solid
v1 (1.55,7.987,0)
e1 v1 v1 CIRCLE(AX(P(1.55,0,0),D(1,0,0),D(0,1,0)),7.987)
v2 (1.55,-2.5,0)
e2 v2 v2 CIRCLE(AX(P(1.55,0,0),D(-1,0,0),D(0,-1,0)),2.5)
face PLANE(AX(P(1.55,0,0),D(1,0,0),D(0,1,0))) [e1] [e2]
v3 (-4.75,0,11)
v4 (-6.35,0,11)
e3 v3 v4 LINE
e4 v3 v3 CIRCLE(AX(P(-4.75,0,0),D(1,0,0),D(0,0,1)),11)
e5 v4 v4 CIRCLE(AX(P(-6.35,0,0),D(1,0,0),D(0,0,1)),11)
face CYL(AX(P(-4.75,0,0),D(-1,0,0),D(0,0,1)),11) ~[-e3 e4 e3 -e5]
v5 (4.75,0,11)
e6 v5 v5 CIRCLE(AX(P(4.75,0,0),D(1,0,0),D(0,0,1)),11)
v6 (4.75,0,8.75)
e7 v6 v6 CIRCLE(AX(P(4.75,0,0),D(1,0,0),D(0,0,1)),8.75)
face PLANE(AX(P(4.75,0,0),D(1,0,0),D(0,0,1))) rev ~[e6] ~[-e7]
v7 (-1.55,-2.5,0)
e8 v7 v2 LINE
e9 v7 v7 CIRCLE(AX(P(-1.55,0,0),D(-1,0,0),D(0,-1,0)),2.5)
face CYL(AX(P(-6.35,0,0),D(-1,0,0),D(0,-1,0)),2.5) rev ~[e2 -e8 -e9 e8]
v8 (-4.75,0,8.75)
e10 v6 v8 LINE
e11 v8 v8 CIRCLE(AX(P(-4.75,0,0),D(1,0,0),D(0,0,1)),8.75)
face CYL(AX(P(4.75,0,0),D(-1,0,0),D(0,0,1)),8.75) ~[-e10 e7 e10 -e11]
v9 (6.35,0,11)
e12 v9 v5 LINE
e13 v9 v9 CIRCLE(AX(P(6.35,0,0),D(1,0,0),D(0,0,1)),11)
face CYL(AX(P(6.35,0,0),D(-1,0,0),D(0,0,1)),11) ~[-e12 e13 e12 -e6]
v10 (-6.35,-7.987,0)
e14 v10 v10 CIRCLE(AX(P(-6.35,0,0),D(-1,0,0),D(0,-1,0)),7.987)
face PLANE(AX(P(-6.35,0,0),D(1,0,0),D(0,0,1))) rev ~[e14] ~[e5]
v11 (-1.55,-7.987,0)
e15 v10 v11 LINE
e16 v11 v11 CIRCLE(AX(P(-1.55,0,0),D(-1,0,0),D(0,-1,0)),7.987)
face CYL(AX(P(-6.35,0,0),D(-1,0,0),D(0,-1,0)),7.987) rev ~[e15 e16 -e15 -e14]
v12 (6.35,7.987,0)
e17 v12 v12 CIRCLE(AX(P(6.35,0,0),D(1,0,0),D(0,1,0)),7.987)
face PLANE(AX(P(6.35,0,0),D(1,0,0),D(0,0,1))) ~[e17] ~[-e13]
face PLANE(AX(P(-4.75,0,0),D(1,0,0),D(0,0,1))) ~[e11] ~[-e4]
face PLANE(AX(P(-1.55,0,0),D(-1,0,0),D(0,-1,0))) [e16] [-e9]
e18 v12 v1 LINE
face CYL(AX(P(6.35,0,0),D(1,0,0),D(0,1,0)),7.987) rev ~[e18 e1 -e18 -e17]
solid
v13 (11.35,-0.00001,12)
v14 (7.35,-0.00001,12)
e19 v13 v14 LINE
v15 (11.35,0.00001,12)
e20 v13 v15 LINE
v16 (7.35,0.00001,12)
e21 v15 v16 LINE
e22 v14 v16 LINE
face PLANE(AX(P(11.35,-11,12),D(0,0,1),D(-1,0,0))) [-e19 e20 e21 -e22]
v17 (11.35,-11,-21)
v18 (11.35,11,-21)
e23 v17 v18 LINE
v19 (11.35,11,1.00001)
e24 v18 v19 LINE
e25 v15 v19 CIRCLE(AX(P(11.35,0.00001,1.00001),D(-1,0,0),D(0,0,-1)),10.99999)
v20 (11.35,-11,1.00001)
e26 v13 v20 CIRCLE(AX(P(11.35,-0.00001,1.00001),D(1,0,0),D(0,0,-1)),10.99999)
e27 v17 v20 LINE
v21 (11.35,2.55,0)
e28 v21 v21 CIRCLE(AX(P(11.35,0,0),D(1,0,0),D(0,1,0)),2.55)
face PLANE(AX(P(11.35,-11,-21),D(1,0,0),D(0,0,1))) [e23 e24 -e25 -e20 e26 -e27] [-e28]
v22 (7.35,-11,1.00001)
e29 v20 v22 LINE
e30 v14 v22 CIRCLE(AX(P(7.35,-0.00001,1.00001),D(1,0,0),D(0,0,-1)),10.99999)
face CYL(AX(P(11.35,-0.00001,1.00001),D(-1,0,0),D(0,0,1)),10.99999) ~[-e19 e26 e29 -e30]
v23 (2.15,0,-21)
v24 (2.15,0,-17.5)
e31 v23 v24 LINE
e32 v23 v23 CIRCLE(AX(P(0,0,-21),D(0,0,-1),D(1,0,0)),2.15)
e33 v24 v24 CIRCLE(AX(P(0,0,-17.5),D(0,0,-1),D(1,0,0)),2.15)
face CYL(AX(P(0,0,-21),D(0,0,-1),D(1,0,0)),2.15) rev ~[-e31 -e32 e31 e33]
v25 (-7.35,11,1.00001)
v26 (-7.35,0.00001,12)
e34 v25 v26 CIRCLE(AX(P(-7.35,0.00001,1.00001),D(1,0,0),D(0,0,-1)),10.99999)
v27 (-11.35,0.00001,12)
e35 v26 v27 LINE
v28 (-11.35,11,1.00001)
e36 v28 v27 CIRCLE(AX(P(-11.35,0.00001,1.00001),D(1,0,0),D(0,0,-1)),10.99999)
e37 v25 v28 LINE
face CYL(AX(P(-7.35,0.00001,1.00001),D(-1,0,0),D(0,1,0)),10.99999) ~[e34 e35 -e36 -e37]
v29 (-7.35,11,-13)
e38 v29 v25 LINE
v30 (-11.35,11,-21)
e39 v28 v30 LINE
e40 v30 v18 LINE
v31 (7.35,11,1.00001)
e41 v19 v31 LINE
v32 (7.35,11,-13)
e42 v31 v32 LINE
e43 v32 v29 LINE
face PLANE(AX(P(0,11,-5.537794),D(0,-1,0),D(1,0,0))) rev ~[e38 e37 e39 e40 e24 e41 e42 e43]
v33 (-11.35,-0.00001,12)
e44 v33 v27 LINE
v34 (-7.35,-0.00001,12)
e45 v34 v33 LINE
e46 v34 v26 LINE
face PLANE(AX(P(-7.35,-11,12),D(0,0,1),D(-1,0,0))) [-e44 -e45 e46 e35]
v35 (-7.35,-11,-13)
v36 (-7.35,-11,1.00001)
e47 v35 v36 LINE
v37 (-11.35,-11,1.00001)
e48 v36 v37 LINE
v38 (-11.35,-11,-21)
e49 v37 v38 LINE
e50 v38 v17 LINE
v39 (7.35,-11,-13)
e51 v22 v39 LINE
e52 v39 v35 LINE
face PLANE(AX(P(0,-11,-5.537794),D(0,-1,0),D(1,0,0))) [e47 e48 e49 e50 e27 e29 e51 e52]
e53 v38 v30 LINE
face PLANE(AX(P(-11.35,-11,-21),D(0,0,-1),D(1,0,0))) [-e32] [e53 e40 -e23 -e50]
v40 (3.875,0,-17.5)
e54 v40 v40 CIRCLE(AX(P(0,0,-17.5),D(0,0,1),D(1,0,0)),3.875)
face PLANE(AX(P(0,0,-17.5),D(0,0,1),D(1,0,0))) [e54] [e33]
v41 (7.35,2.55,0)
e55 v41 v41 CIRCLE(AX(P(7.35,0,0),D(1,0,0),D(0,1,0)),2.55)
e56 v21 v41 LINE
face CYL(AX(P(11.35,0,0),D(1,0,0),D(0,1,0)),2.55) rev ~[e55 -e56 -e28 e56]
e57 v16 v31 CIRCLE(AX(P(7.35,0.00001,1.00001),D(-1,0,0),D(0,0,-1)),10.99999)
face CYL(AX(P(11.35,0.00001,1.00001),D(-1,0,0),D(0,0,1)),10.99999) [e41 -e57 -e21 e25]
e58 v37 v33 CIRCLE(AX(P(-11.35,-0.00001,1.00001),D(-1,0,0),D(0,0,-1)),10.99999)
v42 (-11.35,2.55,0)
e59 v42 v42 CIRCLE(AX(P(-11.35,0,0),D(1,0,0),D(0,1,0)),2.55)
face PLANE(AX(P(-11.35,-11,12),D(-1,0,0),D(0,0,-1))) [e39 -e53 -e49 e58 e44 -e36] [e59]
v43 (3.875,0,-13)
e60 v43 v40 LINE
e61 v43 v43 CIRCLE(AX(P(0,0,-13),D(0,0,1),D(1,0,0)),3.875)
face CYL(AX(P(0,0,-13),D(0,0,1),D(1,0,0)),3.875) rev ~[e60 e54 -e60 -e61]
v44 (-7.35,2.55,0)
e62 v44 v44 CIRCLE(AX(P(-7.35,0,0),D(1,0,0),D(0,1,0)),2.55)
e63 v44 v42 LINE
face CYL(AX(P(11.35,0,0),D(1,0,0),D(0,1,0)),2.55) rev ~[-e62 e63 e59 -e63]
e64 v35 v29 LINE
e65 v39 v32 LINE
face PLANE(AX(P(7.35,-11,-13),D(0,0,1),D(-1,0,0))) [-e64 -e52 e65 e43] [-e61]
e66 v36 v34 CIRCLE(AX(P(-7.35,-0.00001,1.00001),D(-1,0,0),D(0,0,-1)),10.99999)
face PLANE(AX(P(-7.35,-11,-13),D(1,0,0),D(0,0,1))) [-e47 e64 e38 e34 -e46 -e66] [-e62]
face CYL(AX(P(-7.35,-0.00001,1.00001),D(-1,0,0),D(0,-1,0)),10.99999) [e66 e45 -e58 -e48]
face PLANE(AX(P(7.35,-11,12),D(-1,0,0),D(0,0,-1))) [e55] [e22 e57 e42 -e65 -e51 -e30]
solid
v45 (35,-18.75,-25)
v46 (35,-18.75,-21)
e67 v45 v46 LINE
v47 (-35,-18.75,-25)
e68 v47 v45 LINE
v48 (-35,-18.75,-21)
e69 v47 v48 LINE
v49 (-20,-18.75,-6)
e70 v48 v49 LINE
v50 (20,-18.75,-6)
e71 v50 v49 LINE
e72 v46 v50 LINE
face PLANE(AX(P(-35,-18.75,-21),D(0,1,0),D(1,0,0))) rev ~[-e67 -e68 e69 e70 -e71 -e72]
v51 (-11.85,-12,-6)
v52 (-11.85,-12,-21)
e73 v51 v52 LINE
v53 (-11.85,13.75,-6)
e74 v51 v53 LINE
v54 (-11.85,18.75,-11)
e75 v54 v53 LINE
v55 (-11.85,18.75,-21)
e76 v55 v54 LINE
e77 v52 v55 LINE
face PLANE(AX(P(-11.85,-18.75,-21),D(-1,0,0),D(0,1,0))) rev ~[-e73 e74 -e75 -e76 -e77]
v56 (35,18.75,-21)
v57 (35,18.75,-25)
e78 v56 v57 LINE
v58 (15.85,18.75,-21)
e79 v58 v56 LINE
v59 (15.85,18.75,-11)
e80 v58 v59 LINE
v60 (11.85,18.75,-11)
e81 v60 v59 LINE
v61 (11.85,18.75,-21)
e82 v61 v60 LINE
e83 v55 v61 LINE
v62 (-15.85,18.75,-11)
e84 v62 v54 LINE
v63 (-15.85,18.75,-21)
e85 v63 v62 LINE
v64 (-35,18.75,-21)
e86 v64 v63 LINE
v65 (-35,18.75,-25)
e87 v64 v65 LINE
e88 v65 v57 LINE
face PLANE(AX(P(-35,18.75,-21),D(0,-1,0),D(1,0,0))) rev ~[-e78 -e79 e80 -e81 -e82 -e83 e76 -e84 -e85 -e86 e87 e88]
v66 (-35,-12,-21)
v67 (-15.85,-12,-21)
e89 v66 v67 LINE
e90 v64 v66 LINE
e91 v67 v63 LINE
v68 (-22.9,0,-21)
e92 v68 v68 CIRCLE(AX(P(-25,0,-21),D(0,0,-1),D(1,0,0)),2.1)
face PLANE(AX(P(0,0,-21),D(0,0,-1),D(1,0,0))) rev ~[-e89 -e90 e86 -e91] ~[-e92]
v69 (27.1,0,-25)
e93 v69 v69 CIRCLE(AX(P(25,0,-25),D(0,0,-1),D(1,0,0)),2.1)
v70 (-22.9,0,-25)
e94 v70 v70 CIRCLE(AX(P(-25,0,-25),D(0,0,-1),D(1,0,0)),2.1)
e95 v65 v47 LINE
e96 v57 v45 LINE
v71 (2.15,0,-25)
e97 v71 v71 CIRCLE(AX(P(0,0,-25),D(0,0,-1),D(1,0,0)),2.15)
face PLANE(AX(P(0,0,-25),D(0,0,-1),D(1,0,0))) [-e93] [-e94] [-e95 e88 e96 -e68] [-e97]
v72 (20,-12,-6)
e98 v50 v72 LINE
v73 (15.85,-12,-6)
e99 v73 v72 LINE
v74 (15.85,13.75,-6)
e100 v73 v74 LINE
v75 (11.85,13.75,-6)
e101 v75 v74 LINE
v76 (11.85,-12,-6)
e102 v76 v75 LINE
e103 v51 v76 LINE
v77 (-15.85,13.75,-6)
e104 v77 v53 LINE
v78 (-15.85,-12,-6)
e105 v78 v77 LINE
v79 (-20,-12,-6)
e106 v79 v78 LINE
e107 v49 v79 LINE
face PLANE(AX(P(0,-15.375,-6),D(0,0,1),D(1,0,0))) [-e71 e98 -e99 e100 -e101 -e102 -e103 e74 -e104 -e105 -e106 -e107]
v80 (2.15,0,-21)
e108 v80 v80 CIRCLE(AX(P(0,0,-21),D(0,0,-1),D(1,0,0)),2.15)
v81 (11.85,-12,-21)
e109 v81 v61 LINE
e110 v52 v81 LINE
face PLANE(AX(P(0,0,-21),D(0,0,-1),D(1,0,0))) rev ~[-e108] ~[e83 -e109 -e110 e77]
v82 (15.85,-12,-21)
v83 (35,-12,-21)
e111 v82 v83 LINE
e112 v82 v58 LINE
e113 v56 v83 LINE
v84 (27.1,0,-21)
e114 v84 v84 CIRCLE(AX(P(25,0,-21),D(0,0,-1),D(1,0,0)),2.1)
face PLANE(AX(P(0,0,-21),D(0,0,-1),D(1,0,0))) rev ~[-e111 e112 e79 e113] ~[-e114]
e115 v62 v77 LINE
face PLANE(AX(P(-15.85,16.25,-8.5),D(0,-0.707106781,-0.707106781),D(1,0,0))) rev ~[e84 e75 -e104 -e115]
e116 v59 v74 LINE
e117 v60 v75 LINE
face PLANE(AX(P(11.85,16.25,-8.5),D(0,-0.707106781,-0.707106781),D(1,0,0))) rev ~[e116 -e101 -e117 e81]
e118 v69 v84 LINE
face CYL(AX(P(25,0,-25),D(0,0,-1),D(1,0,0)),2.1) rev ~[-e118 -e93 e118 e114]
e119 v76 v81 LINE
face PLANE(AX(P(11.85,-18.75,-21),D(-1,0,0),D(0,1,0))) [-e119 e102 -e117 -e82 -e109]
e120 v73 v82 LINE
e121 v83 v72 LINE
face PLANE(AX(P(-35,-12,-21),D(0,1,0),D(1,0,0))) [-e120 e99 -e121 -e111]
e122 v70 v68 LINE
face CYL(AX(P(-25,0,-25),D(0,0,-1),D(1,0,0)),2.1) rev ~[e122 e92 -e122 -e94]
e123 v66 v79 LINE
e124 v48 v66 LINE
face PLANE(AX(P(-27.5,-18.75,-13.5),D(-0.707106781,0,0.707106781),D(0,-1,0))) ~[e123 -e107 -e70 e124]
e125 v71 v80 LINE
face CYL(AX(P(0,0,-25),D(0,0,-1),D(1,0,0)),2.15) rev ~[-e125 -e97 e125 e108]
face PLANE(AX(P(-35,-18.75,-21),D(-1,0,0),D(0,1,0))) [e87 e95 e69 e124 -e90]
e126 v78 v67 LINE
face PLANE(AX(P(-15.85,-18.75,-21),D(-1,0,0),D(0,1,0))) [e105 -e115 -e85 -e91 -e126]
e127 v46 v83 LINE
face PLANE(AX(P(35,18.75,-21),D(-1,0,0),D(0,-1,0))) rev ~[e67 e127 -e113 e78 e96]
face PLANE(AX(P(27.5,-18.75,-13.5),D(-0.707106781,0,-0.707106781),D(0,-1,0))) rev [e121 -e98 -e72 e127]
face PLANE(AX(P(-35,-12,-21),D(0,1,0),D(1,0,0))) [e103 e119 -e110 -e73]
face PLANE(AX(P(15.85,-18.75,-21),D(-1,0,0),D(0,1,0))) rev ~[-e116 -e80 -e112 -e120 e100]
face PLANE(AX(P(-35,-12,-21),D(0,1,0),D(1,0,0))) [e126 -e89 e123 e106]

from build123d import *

# Parameters (mm, degrees)
F3_R      = 7.987
F4_DEPTH  = 4.8
F5_R      = 7.987
F6_DEPTH  = 4.8
F2_R      = 2.5
F7_DEPTH  = 12.701
F10_DEPTH = 22
F11_R     = 2.55
F12_DEPTH = 22.701
F13_R     = 10.99999
F14_R     = 2.15
F15_DEPTH = 8
F16_R     = 3.875
F17_DEPTH = 4.5
F18_W     = 70
F18_H     = 37.5
F19_DEPTH = 4
F20_W     = 4
F20_H     = 37.5
F21_DEPTH = 15
F22_W     = 70
F22_H     = 6.75
F23_DEPTH = 15
F24_SIZE  = 15
F25_SIZE  = 5
F26_R     = 2.15
F27_DEPTH = 4
F28_R     = 2.1
F29_DEPTH = 4


# Not quite as in the source:
# - a fillet or chamfer is up to 0.001 mm smaller than in the source, because OpenCascade refuses the exact size


with BuildPart() as f1:
    # F0 (on Front) → F1 (revolve)
    with BuildSketch(Plane.XZ):
        Polygon((-6.35, 11), (-6.35, 0), (6.35, 0), (6.35, 11), (4.75, 11), (4.75, 8.75), (0, 8.75), (-4.75, 8.75), (-4.75, 11), align=None)
    revolve(axis=Axis((1.279097545, 0, 0), (1, 0, 0)))

    # F3 (on face) → F4 (cut)
    with BuildSketch(Plane(origin=(-6.35, 0, 0), x_dir=(0, -1, 0), z_dir=(-1, 0, 0))):
        Circle(F3_R)
    extrude(amount=-F4_DEPTH, mode=Mode.SUBTRACT)

    # F5 (on face) → F6 (cut)
    with BuildSketch(Plane.YZ.offset(6.35)):
        Circle(F5_R)
    extrude(amount=-F6_DEPTH, mode=Mode.SUBTRACT)

    # F2 (on face) → F7 (cut, through all)
    with BuildSketch(Plane(origin=(-6.35, 0, 0), x_dir=(0, -1, 0), z_dir=(-1, 0, 0))):
        Circle(F2_R)
    extrude(amount=-F7_DEPTH, mode=Mode.SUBTRACT)


with BuildPart() as f10:
    # F9 (on offset) → F10 (new body)
    with BuildSketch(Plane.XZ.offset(11)):
        Polygon((7.35, 12), (7.35, 0), (7.35, -13), (0, -13), (-7.35, -13), (-7.35, 0), (-7.35, 12), (-11.35, 12), (-11.35, -21), (0, -21), (11.35, -21), (11.35, 12), align=None)
    extrude(amount=-F10_DEPTH)

    # F11 (on face) → F12 (cut, through all)
    with BuildSketch(Plane.YZ.offset(11.35)):
        Circle(F11_R)
    extrude(amount=-F12_DEPTH, mode=Mode.SUBTRACT)

    # F13 (radius 11 in the source; OpenCascade refuses exactly that, so slightly less here)
    f13_edges = [f10.edges().sort_by_distance(p)[0] for p in [
        (-9.35, 11, 12),
        (9.35, 11, 12),
        (-9.35, -11, 12),
        (9.35, -11, 12),
    ]]
    fillet(f13_edges, radius=F13_R)

    # F14 (on face) → F15 (cut, through all)
    with BuildSketch(Plane(origin=(0, 0, -21), x_dir=(1, 0, 0), z_dir=(0, 0, -1))):
        Circle(F14_R)
    extrude(amount=-F15_DEPTH, mode=Mode.SUBTRACT)

    # F16 (on face) → F17 (cut)
    with BuildSketch(Plane.XY.offset(-13)):
        Circle(F16_R)
    extrude(amount=-F17_DEPTH, mode=Mode.SUBTRACT)


with BuildPart() as f19:
    # F18 (on face) → F19 (new body)
    with BuildSketch(Plane(origin=(0, 0, -21), x_dir=(1, 0, 0), z_dir=(0, 0, -1))):
        Rectangle(F18_W, F18_H)
    extrude(amount=F19_DEPTH)

    # F20 (on face) → F21 (join)
    with BuildSketch(Plane.XY.offset(-21)):
        with Locations((-13.85, 0)):
            Rectangle(F20_W, F20_H)
        with Locations((13.85, 0)):
            Rectangle(F20_W, F20_H)
    extrude(amount=F21_DEPTH)

    # F22 (on face) → F23 (join, through all)
    with BuildSketch(Plane.XY.offset(-21)):
        with Locations((0, -15.375)):
            Rectangle(F22_W, F22_H)
    extrude(amount=F23_DEPTH)

    # F24
    f24_edges = [f19.edges().sort_by_distance(p)[0] for p in [
        (35, -15.375, -6),
        (-35, -15.375, -6),
    ]]
    chamfer(f24_edges, length=F24_SIZE)

    # F25
    f25_edges = [f19.edges().sort_by_distance(p)[0] for p in [
        (-13.85, 18.75, -6),
        (13.85, 18.75, -6),
    ]]
    chamfer(f25_edges, length=F25_SIZE)

    # F26 (on face) → F27 (cut, through all)
    with BuildSketch(Plane(origin=(0, 0, -25), x_dir=(1, 0, 0), z_dir=(0, 0, -1))):
        Circle(F26_R)
    extrude(amount=-F27_DEPTH, mode=Mode.SUBTRACT)

    # F28 (on face) → F29 (cut, through all)
    with BuildSketch(Plane(origin=(0, 0, -25), x_dir=(1, 0, 0), z_dir=(0, 0, -1))):
        with Locations((-25, 0)):
            Circle(F28_R)
        with Locations((25, 0)):
            Circle(F28_R)
    extrude(amount=-F29_DEPTH, mode=Mode.SUBTRACT)


solid = Compound([f1.part, f10.part, f19.part])
